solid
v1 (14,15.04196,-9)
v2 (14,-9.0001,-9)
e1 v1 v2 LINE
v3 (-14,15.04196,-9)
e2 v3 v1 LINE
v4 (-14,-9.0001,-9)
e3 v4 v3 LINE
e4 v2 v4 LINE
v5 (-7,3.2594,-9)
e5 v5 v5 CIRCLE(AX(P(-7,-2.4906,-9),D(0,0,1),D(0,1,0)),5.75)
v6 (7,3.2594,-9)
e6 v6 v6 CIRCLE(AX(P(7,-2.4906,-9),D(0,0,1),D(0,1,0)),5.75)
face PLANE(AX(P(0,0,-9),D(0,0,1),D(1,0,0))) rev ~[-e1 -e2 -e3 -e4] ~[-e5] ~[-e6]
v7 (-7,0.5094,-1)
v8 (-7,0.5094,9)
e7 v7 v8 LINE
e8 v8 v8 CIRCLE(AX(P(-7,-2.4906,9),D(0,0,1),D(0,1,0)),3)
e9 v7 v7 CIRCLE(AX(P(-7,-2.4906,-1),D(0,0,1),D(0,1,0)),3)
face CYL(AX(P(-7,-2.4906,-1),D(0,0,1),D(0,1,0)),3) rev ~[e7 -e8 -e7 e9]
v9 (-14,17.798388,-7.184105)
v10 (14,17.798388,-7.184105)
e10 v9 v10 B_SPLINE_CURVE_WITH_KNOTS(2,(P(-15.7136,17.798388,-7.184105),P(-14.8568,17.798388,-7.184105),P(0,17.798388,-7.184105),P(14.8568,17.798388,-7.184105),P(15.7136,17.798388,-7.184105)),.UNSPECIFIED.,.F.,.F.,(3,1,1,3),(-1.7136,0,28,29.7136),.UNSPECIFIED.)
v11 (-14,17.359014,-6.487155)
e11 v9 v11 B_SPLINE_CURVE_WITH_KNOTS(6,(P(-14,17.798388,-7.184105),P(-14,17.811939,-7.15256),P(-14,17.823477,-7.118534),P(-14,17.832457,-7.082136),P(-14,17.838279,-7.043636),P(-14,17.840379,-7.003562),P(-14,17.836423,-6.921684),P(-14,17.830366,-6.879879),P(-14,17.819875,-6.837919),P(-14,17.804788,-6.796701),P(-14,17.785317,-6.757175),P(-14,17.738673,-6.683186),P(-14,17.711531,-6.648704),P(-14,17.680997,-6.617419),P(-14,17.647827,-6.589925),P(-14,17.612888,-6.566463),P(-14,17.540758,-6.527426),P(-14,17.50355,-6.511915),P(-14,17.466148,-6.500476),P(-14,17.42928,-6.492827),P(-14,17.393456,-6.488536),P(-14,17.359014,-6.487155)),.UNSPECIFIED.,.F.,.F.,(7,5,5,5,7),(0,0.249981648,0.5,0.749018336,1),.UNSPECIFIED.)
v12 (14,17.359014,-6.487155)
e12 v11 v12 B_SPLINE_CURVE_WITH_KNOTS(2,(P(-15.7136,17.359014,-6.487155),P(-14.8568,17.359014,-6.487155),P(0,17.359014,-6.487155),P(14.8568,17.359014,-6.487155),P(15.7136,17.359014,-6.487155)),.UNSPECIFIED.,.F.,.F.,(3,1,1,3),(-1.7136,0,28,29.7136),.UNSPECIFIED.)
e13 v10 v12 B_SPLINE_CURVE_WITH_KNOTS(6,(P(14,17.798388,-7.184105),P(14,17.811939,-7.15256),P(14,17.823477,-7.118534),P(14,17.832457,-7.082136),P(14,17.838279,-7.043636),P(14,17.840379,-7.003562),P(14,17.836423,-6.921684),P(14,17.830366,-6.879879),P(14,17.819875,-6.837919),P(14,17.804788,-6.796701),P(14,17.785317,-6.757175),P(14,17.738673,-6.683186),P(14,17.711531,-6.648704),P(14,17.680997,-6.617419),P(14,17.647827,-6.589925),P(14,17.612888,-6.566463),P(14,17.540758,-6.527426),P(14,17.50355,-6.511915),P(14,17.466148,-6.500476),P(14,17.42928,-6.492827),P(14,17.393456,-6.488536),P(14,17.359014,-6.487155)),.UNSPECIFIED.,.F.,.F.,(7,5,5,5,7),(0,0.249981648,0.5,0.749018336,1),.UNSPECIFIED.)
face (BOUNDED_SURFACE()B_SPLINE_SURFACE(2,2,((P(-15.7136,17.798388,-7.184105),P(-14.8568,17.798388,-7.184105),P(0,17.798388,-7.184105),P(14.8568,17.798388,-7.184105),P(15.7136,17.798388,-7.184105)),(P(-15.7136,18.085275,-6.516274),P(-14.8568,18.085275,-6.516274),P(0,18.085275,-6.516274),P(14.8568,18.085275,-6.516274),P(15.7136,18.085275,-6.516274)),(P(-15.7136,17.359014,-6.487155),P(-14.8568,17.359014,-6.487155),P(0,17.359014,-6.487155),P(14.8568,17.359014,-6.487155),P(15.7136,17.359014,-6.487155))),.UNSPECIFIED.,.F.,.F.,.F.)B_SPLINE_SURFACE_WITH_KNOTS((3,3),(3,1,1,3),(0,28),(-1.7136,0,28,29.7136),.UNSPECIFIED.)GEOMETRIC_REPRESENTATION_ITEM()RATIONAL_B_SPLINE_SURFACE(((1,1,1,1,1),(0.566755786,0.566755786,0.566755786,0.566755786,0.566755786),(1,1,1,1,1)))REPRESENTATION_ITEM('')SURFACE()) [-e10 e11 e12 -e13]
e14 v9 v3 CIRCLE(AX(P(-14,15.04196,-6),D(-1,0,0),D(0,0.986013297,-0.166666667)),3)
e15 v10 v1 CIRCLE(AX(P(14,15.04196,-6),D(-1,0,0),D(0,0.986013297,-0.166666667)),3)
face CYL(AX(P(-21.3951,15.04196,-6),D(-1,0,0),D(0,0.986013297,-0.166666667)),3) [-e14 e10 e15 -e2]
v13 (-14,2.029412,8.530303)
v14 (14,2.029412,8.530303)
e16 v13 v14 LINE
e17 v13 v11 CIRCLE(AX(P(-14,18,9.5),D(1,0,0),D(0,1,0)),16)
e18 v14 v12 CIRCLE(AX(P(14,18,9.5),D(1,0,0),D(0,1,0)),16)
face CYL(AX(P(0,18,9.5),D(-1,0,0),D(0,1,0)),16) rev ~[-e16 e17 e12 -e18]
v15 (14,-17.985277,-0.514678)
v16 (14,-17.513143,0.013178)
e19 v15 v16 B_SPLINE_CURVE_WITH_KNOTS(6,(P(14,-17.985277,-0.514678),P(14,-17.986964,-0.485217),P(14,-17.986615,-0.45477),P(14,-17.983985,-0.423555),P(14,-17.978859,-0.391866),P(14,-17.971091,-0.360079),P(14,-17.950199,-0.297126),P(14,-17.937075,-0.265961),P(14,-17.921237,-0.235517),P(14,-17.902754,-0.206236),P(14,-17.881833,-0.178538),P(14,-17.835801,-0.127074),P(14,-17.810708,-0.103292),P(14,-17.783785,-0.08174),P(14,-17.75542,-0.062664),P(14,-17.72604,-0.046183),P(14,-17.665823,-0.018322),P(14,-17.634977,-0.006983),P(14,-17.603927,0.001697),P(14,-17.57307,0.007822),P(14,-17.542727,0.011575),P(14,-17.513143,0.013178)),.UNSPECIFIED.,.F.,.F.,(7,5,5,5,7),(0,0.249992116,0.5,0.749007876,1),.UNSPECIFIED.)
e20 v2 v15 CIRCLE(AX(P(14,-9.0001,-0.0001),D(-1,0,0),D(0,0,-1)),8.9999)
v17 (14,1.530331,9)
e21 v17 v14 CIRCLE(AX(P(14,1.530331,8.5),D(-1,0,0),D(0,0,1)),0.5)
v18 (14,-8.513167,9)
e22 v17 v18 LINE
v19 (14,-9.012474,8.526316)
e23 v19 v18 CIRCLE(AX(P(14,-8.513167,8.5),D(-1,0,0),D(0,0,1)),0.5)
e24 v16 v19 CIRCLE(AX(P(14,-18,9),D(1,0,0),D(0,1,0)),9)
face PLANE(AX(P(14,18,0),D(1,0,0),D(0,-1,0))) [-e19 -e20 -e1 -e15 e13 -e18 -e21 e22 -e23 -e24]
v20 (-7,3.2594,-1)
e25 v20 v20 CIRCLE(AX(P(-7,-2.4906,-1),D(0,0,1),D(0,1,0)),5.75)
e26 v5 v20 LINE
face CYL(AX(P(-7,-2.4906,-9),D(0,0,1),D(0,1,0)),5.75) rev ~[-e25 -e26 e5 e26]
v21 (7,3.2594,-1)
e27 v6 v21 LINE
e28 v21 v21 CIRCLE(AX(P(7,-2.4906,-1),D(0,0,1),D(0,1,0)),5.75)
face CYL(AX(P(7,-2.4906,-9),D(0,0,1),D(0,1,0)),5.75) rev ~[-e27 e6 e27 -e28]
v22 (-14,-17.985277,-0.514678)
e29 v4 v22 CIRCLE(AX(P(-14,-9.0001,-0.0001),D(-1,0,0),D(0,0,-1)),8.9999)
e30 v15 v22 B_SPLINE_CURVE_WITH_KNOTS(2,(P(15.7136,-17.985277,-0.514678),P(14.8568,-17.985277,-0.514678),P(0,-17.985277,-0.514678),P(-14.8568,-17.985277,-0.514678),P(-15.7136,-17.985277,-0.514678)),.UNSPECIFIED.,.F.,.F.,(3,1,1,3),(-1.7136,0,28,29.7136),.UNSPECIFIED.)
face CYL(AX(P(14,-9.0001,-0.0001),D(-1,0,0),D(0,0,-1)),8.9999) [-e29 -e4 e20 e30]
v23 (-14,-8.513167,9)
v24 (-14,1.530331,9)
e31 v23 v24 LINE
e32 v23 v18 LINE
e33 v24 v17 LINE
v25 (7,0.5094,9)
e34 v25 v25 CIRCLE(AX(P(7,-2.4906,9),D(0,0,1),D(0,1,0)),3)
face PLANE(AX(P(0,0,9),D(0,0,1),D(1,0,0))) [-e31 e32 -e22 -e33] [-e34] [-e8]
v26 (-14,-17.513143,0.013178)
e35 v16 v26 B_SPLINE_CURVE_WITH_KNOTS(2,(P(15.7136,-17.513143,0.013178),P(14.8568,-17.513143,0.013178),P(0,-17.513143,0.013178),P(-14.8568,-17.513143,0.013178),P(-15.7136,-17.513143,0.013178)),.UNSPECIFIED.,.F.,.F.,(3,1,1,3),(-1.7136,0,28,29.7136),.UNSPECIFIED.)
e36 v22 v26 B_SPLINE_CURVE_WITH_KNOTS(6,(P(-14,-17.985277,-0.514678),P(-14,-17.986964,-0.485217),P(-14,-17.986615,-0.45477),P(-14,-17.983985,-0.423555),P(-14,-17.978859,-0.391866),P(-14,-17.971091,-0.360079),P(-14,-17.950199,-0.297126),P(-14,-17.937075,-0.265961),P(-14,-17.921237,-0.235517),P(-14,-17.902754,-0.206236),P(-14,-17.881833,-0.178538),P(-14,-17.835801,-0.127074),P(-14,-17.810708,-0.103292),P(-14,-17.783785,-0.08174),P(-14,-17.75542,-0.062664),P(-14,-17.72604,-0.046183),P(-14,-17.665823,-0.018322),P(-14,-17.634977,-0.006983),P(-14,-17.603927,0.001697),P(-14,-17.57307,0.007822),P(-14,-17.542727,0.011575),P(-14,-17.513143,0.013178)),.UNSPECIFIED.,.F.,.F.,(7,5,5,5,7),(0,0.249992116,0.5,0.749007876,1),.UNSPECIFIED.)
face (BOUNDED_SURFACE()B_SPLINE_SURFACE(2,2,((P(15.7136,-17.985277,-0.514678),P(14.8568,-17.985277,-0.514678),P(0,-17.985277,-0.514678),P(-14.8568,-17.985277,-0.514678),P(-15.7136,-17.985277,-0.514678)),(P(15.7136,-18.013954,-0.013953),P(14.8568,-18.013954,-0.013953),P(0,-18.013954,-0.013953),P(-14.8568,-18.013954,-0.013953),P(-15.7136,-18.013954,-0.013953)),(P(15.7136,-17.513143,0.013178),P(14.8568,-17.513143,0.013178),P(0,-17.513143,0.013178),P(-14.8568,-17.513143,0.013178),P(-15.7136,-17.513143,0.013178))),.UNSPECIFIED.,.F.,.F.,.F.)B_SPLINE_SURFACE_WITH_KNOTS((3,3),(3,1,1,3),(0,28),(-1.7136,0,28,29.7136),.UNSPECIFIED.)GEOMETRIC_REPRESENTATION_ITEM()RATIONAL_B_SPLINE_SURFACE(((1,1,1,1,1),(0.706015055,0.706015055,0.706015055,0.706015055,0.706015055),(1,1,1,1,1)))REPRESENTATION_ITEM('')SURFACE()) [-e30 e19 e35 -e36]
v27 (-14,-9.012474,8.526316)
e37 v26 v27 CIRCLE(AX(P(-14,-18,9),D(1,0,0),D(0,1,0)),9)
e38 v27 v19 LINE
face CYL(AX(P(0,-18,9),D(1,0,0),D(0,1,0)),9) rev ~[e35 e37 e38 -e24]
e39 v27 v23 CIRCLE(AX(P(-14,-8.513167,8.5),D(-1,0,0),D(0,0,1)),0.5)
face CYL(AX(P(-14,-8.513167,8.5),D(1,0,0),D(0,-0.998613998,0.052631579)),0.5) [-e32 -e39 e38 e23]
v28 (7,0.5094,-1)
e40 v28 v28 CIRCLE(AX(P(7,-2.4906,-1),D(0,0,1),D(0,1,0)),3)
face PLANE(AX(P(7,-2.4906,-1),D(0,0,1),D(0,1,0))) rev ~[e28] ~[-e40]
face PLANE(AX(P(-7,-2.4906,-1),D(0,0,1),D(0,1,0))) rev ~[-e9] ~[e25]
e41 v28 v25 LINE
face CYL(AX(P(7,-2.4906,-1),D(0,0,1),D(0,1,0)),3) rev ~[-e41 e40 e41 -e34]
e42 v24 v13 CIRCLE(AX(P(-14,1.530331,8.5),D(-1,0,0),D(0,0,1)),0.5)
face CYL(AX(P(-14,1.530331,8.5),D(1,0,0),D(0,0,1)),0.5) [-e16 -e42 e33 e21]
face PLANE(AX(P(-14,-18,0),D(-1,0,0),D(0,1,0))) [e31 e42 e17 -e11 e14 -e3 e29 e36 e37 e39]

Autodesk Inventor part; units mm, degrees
ref_plane "YZ Plane" through (0, 0, 0) normal (1, 0, 0) x (0, 1, 0)
ref_plane "XZ Plane" through (0, 0, 0) normal (0, 1, 0) x (-1, 0, 0)
ref_plane "XY Plane" through (0, 0, 0) normal (0, 0, 1) x (1, 0, 0)
sketch "Szkic1" plane through (0, 0, 0) normal (0, 0, 1) x (1, 0, 0)
  line L0 (-14, 18) -> (14, 18)
  line L1 (14, 18) -> (14, -18)
  line L2 (14, -18) -> (-14, -18)
  line L3 (-14, -18) -> (-14, 18)
  line L4 (-14, 18) -> (14, -18) construction
  line L5 (14, 18) -> (-14, -18) construction
  point P0 (0, 0)
  dimension "d0" = 28
  dimension "d1" = 36
extrude "Wyciągnięcie proste1" add sketch "Szkic1" along normal mid plane 18
sketch "Szkic3" plane through (0, 0, 0) normal (1, 0, 0) x (0, 1, 0)
  line L0 (-18, 9) -> (-18, -9) construction
  line L1 (-18, 9) -> (18, 9) construction
  line L2 (18, 9) -> (18, -9) construction
  circle A0 centre (-18, 9) radius 9
  circle A1 centre (18, 9.5) radius 16
  point P0 (0, 0)
  dimension "d4" = 18
  dimension "d6" = 32
  dimension "d7" = 0.5
extrude "Wyciągnięcie proste2" cut sketch "Szkic3" along normal mid plane 28
fillet "Zaokrąglenie1" radius 3 1 edges at (0, 18, -9)
fillet "Zaokrąglenie2" radius 9 1 edges at (0, -18, -9)
fillet "Zaokrąglenie3" radius 0.5 5 edges at (0, -9, 9) (0, 2.0078, 9) (0, -18, -0.0001) (0, -18, 0) (0, 18, -6.5)
sketch "Szkic4" plane through (0, 0, -9) normal (0, 0, -1) x (-1, 0, 0)
  line L0 (14, -9) -> (-14, -9) projected
  line L1 (14, -9) -> (14, 15.042) projected
  line L2 (-14, 15.042) -> (14, 15.042) projected
  line L3 (-14, 15.042) -> (-14, -9) projected
  line L4 (-14, 2.0294) -> (14, 2.0294) projected
  line L5 (14, -9.0125) -> (-14, -9.0125) projected
  line L6 (0, 0) -> (0, 3.9534) construction
  point P0 (-7, -2.4906)
  point P1 (7, -2.4906)
  point P2 (-12.5, 2.0294)
  point P3 (12.5, 2.0294)
  point P4 (12.5, -7.0104)
  point P5 (-12.5, -7.0104)
  dimension "d14" = 4.52
  dimension "d15" = 14
hole "Otwór1" at (7, -2.4906, -9) at (-7, -2.4906, -9) direction (0, 0, 1) diameter 6 end through all counterbore diameter 11.5 counterbore depth 8
properties part number "Zawias" material "Stal nierdzewna"
